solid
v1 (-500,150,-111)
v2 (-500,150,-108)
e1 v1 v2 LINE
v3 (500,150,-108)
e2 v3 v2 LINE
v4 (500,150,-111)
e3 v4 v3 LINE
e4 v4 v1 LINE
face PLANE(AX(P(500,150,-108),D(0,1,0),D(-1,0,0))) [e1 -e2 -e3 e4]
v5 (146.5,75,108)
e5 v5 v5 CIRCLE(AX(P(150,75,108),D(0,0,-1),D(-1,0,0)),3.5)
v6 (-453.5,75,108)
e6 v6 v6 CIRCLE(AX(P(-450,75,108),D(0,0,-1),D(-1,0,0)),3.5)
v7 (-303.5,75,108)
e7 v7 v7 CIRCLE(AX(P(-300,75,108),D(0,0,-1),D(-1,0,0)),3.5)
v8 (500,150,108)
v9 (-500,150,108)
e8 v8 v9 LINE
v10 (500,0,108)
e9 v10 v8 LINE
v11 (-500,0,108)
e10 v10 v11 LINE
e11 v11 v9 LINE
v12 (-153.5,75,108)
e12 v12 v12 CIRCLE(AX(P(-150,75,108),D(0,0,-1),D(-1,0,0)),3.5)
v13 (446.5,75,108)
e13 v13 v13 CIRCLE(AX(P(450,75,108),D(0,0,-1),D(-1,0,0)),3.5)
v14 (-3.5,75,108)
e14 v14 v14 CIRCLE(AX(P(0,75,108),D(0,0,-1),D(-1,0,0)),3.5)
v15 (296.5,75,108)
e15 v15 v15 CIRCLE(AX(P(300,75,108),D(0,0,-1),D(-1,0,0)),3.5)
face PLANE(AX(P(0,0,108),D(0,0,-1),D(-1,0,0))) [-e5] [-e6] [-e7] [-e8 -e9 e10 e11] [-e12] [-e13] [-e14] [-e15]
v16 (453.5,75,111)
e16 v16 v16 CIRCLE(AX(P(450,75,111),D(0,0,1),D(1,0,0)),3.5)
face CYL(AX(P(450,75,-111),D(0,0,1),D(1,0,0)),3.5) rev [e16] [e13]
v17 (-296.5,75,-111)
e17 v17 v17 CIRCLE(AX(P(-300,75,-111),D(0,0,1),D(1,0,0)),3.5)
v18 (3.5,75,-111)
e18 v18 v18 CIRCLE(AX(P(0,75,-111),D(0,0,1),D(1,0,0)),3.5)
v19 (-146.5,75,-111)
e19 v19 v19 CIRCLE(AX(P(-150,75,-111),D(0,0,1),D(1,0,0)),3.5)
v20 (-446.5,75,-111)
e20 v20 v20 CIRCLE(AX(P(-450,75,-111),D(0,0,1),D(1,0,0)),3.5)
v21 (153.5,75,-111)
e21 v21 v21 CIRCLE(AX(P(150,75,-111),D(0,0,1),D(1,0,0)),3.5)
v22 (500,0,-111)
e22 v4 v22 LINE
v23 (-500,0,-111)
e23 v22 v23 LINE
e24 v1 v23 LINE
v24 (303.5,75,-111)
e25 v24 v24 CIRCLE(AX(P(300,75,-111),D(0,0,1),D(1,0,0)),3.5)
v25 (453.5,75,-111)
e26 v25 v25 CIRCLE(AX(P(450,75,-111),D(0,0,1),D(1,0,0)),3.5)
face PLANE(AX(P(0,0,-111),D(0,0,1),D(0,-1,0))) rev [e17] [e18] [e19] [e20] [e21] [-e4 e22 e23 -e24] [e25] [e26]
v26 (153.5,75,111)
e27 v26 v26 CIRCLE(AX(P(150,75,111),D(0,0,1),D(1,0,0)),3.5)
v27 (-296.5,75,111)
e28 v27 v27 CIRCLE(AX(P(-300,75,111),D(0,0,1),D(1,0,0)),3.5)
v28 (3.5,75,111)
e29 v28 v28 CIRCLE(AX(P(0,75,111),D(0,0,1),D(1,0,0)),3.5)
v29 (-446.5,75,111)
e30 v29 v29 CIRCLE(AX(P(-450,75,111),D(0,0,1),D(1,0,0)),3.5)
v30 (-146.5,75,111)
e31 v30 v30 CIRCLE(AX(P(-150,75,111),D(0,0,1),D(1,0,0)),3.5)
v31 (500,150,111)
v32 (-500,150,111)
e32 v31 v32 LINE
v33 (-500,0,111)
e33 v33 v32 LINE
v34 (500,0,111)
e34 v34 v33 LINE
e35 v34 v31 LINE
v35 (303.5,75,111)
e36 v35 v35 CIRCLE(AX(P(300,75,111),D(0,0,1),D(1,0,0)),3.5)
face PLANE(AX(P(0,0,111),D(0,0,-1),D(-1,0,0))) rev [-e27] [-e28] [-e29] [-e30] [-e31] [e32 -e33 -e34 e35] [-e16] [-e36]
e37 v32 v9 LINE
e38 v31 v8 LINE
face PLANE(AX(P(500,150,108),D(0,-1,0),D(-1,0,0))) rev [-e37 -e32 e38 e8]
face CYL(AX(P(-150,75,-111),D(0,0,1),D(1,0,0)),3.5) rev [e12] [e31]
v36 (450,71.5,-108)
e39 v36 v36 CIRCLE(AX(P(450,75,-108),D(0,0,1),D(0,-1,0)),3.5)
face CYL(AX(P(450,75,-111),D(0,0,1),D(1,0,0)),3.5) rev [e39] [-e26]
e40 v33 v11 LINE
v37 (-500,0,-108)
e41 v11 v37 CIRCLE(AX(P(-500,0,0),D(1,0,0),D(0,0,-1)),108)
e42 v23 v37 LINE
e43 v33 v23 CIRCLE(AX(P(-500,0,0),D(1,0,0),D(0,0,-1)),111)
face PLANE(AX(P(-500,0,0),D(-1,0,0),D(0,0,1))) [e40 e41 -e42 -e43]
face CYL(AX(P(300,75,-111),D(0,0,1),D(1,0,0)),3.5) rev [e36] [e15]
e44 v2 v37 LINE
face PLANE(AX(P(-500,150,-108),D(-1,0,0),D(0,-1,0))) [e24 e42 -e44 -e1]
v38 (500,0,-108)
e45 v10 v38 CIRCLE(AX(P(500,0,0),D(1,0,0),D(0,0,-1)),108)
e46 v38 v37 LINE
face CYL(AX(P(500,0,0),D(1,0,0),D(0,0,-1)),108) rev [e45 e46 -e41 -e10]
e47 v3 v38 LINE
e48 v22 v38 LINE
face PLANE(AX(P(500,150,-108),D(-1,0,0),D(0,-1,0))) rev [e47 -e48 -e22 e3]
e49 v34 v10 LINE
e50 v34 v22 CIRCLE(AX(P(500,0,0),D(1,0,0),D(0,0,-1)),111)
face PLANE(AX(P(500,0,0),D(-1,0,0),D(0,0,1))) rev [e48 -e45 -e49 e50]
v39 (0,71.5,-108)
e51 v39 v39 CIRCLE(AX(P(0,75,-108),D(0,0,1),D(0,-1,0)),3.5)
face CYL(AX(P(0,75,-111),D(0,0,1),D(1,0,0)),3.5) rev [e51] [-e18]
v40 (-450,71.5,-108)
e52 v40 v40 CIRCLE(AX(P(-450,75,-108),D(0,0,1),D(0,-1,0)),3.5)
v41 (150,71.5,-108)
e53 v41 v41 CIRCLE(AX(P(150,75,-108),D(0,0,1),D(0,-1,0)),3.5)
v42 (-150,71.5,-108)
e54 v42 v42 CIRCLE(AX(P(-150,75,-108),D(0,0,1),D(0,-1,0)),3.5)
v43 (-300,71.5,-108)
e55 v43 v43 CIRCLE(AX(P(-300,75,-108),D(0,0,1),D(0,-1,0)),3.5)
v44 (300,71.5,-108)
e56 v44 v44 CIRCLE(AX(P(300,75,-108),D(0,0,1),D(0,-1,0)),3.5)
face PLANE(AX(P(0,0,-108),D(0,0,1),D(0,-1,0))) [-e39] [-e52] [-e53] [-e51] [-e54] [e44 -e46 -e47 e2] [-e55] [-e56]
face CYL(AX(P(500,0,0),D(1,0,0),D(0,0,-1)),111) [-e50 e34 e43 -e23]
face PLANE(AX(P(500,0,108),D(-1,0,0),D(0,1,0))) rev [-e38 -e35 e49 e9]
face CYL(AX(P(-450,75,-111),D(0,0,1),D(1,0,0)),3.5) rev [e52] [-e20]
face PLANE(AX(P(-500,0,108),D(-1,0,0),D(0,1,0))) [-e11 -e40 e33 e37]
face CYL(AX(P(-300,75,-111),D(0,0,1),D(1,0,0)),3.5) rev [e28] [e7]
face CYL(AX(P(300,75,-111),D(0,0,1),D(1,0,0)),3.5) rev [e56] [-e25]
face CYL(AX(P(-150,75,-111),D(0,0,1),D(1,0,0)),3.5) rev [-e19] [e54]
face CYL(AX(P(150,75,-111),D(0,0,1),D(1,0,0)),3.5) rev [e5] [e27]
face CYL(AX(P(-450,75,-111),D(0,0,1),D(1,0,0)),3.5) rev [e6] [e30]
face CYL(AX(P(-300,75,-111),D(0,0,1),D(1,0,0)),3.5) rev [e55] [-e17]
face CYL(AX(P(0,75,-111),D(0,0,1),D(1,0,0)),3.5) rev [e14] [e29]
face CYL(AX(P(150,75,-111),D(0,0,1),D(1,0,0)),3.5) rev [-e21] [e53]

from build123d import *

# Parameters (mm, degrees)
OTHER_START              = -500
OTHER_2_DEPTH            = 1000
CUT_EXTRUDE_3_DEPTH      = 534.686237409
CUT_EXTRUDE_3_DEPTH_BACK = 534.686237409
SKETCH_11_R              = 3.5


# Read off the part's stored shape, not the designer's step: Элемент по сечениям сгиба2
with BuildPart() as part:
    # Other 2 outline → Other 2 (new body)
    with BuildSketch(Plane.YZ.offset(OTHER_START)):
        with BuildLine():
            Line((0, -111), (150, -111))
            Line((150, -111), (150, -108))
            Line((150, -108), (0, -108))
            ThreePointArc((0, -108), (-108, 0), (0, 108))
            Line((0, 108), (150, 108))
            Line((150, 108), (150, 111))
            Line((150, 111), (0, 111))
            ThreePointArc((0, 111), (-111, 0), (0, -111))
        make_face()
    extrude(amount=OTHER_2_DEPTH)

    # Эскиз11 → Вырез-Вытянуть3 (cut, two sides: drawn at the far end of the back side and taken through both)
    with BuildSketch(Plane.XY.offset(-CUT_EXTRUDE_3_DEPTH_BACK)):
        with Locations((450, 75)):
            Circle(SKETCH_11_R)
        with Locations((300, 75)):
            Circle(SKETCH_11_R)
        with Locations((150, 75)):
            Circle(SKETCH_11_R)
        with Locations((0, 75)):
            Circle(SKETCH_11_R)
        with Locations((-150, 75)):
            Circle(SKETCH_11_R)
        with Locations((-300, 75)):
            Circle(SKETCH_11_R)
        with Locations((-450, 75)):
            Circle(SKETCH_11_R)
    extrude(amount=CUT_EXTRUDE_3_DEPTH + CUT_EXTRUDE_3_DEPTH_BACK, mode=Mode.SUBTRACT)


solid = part.part
